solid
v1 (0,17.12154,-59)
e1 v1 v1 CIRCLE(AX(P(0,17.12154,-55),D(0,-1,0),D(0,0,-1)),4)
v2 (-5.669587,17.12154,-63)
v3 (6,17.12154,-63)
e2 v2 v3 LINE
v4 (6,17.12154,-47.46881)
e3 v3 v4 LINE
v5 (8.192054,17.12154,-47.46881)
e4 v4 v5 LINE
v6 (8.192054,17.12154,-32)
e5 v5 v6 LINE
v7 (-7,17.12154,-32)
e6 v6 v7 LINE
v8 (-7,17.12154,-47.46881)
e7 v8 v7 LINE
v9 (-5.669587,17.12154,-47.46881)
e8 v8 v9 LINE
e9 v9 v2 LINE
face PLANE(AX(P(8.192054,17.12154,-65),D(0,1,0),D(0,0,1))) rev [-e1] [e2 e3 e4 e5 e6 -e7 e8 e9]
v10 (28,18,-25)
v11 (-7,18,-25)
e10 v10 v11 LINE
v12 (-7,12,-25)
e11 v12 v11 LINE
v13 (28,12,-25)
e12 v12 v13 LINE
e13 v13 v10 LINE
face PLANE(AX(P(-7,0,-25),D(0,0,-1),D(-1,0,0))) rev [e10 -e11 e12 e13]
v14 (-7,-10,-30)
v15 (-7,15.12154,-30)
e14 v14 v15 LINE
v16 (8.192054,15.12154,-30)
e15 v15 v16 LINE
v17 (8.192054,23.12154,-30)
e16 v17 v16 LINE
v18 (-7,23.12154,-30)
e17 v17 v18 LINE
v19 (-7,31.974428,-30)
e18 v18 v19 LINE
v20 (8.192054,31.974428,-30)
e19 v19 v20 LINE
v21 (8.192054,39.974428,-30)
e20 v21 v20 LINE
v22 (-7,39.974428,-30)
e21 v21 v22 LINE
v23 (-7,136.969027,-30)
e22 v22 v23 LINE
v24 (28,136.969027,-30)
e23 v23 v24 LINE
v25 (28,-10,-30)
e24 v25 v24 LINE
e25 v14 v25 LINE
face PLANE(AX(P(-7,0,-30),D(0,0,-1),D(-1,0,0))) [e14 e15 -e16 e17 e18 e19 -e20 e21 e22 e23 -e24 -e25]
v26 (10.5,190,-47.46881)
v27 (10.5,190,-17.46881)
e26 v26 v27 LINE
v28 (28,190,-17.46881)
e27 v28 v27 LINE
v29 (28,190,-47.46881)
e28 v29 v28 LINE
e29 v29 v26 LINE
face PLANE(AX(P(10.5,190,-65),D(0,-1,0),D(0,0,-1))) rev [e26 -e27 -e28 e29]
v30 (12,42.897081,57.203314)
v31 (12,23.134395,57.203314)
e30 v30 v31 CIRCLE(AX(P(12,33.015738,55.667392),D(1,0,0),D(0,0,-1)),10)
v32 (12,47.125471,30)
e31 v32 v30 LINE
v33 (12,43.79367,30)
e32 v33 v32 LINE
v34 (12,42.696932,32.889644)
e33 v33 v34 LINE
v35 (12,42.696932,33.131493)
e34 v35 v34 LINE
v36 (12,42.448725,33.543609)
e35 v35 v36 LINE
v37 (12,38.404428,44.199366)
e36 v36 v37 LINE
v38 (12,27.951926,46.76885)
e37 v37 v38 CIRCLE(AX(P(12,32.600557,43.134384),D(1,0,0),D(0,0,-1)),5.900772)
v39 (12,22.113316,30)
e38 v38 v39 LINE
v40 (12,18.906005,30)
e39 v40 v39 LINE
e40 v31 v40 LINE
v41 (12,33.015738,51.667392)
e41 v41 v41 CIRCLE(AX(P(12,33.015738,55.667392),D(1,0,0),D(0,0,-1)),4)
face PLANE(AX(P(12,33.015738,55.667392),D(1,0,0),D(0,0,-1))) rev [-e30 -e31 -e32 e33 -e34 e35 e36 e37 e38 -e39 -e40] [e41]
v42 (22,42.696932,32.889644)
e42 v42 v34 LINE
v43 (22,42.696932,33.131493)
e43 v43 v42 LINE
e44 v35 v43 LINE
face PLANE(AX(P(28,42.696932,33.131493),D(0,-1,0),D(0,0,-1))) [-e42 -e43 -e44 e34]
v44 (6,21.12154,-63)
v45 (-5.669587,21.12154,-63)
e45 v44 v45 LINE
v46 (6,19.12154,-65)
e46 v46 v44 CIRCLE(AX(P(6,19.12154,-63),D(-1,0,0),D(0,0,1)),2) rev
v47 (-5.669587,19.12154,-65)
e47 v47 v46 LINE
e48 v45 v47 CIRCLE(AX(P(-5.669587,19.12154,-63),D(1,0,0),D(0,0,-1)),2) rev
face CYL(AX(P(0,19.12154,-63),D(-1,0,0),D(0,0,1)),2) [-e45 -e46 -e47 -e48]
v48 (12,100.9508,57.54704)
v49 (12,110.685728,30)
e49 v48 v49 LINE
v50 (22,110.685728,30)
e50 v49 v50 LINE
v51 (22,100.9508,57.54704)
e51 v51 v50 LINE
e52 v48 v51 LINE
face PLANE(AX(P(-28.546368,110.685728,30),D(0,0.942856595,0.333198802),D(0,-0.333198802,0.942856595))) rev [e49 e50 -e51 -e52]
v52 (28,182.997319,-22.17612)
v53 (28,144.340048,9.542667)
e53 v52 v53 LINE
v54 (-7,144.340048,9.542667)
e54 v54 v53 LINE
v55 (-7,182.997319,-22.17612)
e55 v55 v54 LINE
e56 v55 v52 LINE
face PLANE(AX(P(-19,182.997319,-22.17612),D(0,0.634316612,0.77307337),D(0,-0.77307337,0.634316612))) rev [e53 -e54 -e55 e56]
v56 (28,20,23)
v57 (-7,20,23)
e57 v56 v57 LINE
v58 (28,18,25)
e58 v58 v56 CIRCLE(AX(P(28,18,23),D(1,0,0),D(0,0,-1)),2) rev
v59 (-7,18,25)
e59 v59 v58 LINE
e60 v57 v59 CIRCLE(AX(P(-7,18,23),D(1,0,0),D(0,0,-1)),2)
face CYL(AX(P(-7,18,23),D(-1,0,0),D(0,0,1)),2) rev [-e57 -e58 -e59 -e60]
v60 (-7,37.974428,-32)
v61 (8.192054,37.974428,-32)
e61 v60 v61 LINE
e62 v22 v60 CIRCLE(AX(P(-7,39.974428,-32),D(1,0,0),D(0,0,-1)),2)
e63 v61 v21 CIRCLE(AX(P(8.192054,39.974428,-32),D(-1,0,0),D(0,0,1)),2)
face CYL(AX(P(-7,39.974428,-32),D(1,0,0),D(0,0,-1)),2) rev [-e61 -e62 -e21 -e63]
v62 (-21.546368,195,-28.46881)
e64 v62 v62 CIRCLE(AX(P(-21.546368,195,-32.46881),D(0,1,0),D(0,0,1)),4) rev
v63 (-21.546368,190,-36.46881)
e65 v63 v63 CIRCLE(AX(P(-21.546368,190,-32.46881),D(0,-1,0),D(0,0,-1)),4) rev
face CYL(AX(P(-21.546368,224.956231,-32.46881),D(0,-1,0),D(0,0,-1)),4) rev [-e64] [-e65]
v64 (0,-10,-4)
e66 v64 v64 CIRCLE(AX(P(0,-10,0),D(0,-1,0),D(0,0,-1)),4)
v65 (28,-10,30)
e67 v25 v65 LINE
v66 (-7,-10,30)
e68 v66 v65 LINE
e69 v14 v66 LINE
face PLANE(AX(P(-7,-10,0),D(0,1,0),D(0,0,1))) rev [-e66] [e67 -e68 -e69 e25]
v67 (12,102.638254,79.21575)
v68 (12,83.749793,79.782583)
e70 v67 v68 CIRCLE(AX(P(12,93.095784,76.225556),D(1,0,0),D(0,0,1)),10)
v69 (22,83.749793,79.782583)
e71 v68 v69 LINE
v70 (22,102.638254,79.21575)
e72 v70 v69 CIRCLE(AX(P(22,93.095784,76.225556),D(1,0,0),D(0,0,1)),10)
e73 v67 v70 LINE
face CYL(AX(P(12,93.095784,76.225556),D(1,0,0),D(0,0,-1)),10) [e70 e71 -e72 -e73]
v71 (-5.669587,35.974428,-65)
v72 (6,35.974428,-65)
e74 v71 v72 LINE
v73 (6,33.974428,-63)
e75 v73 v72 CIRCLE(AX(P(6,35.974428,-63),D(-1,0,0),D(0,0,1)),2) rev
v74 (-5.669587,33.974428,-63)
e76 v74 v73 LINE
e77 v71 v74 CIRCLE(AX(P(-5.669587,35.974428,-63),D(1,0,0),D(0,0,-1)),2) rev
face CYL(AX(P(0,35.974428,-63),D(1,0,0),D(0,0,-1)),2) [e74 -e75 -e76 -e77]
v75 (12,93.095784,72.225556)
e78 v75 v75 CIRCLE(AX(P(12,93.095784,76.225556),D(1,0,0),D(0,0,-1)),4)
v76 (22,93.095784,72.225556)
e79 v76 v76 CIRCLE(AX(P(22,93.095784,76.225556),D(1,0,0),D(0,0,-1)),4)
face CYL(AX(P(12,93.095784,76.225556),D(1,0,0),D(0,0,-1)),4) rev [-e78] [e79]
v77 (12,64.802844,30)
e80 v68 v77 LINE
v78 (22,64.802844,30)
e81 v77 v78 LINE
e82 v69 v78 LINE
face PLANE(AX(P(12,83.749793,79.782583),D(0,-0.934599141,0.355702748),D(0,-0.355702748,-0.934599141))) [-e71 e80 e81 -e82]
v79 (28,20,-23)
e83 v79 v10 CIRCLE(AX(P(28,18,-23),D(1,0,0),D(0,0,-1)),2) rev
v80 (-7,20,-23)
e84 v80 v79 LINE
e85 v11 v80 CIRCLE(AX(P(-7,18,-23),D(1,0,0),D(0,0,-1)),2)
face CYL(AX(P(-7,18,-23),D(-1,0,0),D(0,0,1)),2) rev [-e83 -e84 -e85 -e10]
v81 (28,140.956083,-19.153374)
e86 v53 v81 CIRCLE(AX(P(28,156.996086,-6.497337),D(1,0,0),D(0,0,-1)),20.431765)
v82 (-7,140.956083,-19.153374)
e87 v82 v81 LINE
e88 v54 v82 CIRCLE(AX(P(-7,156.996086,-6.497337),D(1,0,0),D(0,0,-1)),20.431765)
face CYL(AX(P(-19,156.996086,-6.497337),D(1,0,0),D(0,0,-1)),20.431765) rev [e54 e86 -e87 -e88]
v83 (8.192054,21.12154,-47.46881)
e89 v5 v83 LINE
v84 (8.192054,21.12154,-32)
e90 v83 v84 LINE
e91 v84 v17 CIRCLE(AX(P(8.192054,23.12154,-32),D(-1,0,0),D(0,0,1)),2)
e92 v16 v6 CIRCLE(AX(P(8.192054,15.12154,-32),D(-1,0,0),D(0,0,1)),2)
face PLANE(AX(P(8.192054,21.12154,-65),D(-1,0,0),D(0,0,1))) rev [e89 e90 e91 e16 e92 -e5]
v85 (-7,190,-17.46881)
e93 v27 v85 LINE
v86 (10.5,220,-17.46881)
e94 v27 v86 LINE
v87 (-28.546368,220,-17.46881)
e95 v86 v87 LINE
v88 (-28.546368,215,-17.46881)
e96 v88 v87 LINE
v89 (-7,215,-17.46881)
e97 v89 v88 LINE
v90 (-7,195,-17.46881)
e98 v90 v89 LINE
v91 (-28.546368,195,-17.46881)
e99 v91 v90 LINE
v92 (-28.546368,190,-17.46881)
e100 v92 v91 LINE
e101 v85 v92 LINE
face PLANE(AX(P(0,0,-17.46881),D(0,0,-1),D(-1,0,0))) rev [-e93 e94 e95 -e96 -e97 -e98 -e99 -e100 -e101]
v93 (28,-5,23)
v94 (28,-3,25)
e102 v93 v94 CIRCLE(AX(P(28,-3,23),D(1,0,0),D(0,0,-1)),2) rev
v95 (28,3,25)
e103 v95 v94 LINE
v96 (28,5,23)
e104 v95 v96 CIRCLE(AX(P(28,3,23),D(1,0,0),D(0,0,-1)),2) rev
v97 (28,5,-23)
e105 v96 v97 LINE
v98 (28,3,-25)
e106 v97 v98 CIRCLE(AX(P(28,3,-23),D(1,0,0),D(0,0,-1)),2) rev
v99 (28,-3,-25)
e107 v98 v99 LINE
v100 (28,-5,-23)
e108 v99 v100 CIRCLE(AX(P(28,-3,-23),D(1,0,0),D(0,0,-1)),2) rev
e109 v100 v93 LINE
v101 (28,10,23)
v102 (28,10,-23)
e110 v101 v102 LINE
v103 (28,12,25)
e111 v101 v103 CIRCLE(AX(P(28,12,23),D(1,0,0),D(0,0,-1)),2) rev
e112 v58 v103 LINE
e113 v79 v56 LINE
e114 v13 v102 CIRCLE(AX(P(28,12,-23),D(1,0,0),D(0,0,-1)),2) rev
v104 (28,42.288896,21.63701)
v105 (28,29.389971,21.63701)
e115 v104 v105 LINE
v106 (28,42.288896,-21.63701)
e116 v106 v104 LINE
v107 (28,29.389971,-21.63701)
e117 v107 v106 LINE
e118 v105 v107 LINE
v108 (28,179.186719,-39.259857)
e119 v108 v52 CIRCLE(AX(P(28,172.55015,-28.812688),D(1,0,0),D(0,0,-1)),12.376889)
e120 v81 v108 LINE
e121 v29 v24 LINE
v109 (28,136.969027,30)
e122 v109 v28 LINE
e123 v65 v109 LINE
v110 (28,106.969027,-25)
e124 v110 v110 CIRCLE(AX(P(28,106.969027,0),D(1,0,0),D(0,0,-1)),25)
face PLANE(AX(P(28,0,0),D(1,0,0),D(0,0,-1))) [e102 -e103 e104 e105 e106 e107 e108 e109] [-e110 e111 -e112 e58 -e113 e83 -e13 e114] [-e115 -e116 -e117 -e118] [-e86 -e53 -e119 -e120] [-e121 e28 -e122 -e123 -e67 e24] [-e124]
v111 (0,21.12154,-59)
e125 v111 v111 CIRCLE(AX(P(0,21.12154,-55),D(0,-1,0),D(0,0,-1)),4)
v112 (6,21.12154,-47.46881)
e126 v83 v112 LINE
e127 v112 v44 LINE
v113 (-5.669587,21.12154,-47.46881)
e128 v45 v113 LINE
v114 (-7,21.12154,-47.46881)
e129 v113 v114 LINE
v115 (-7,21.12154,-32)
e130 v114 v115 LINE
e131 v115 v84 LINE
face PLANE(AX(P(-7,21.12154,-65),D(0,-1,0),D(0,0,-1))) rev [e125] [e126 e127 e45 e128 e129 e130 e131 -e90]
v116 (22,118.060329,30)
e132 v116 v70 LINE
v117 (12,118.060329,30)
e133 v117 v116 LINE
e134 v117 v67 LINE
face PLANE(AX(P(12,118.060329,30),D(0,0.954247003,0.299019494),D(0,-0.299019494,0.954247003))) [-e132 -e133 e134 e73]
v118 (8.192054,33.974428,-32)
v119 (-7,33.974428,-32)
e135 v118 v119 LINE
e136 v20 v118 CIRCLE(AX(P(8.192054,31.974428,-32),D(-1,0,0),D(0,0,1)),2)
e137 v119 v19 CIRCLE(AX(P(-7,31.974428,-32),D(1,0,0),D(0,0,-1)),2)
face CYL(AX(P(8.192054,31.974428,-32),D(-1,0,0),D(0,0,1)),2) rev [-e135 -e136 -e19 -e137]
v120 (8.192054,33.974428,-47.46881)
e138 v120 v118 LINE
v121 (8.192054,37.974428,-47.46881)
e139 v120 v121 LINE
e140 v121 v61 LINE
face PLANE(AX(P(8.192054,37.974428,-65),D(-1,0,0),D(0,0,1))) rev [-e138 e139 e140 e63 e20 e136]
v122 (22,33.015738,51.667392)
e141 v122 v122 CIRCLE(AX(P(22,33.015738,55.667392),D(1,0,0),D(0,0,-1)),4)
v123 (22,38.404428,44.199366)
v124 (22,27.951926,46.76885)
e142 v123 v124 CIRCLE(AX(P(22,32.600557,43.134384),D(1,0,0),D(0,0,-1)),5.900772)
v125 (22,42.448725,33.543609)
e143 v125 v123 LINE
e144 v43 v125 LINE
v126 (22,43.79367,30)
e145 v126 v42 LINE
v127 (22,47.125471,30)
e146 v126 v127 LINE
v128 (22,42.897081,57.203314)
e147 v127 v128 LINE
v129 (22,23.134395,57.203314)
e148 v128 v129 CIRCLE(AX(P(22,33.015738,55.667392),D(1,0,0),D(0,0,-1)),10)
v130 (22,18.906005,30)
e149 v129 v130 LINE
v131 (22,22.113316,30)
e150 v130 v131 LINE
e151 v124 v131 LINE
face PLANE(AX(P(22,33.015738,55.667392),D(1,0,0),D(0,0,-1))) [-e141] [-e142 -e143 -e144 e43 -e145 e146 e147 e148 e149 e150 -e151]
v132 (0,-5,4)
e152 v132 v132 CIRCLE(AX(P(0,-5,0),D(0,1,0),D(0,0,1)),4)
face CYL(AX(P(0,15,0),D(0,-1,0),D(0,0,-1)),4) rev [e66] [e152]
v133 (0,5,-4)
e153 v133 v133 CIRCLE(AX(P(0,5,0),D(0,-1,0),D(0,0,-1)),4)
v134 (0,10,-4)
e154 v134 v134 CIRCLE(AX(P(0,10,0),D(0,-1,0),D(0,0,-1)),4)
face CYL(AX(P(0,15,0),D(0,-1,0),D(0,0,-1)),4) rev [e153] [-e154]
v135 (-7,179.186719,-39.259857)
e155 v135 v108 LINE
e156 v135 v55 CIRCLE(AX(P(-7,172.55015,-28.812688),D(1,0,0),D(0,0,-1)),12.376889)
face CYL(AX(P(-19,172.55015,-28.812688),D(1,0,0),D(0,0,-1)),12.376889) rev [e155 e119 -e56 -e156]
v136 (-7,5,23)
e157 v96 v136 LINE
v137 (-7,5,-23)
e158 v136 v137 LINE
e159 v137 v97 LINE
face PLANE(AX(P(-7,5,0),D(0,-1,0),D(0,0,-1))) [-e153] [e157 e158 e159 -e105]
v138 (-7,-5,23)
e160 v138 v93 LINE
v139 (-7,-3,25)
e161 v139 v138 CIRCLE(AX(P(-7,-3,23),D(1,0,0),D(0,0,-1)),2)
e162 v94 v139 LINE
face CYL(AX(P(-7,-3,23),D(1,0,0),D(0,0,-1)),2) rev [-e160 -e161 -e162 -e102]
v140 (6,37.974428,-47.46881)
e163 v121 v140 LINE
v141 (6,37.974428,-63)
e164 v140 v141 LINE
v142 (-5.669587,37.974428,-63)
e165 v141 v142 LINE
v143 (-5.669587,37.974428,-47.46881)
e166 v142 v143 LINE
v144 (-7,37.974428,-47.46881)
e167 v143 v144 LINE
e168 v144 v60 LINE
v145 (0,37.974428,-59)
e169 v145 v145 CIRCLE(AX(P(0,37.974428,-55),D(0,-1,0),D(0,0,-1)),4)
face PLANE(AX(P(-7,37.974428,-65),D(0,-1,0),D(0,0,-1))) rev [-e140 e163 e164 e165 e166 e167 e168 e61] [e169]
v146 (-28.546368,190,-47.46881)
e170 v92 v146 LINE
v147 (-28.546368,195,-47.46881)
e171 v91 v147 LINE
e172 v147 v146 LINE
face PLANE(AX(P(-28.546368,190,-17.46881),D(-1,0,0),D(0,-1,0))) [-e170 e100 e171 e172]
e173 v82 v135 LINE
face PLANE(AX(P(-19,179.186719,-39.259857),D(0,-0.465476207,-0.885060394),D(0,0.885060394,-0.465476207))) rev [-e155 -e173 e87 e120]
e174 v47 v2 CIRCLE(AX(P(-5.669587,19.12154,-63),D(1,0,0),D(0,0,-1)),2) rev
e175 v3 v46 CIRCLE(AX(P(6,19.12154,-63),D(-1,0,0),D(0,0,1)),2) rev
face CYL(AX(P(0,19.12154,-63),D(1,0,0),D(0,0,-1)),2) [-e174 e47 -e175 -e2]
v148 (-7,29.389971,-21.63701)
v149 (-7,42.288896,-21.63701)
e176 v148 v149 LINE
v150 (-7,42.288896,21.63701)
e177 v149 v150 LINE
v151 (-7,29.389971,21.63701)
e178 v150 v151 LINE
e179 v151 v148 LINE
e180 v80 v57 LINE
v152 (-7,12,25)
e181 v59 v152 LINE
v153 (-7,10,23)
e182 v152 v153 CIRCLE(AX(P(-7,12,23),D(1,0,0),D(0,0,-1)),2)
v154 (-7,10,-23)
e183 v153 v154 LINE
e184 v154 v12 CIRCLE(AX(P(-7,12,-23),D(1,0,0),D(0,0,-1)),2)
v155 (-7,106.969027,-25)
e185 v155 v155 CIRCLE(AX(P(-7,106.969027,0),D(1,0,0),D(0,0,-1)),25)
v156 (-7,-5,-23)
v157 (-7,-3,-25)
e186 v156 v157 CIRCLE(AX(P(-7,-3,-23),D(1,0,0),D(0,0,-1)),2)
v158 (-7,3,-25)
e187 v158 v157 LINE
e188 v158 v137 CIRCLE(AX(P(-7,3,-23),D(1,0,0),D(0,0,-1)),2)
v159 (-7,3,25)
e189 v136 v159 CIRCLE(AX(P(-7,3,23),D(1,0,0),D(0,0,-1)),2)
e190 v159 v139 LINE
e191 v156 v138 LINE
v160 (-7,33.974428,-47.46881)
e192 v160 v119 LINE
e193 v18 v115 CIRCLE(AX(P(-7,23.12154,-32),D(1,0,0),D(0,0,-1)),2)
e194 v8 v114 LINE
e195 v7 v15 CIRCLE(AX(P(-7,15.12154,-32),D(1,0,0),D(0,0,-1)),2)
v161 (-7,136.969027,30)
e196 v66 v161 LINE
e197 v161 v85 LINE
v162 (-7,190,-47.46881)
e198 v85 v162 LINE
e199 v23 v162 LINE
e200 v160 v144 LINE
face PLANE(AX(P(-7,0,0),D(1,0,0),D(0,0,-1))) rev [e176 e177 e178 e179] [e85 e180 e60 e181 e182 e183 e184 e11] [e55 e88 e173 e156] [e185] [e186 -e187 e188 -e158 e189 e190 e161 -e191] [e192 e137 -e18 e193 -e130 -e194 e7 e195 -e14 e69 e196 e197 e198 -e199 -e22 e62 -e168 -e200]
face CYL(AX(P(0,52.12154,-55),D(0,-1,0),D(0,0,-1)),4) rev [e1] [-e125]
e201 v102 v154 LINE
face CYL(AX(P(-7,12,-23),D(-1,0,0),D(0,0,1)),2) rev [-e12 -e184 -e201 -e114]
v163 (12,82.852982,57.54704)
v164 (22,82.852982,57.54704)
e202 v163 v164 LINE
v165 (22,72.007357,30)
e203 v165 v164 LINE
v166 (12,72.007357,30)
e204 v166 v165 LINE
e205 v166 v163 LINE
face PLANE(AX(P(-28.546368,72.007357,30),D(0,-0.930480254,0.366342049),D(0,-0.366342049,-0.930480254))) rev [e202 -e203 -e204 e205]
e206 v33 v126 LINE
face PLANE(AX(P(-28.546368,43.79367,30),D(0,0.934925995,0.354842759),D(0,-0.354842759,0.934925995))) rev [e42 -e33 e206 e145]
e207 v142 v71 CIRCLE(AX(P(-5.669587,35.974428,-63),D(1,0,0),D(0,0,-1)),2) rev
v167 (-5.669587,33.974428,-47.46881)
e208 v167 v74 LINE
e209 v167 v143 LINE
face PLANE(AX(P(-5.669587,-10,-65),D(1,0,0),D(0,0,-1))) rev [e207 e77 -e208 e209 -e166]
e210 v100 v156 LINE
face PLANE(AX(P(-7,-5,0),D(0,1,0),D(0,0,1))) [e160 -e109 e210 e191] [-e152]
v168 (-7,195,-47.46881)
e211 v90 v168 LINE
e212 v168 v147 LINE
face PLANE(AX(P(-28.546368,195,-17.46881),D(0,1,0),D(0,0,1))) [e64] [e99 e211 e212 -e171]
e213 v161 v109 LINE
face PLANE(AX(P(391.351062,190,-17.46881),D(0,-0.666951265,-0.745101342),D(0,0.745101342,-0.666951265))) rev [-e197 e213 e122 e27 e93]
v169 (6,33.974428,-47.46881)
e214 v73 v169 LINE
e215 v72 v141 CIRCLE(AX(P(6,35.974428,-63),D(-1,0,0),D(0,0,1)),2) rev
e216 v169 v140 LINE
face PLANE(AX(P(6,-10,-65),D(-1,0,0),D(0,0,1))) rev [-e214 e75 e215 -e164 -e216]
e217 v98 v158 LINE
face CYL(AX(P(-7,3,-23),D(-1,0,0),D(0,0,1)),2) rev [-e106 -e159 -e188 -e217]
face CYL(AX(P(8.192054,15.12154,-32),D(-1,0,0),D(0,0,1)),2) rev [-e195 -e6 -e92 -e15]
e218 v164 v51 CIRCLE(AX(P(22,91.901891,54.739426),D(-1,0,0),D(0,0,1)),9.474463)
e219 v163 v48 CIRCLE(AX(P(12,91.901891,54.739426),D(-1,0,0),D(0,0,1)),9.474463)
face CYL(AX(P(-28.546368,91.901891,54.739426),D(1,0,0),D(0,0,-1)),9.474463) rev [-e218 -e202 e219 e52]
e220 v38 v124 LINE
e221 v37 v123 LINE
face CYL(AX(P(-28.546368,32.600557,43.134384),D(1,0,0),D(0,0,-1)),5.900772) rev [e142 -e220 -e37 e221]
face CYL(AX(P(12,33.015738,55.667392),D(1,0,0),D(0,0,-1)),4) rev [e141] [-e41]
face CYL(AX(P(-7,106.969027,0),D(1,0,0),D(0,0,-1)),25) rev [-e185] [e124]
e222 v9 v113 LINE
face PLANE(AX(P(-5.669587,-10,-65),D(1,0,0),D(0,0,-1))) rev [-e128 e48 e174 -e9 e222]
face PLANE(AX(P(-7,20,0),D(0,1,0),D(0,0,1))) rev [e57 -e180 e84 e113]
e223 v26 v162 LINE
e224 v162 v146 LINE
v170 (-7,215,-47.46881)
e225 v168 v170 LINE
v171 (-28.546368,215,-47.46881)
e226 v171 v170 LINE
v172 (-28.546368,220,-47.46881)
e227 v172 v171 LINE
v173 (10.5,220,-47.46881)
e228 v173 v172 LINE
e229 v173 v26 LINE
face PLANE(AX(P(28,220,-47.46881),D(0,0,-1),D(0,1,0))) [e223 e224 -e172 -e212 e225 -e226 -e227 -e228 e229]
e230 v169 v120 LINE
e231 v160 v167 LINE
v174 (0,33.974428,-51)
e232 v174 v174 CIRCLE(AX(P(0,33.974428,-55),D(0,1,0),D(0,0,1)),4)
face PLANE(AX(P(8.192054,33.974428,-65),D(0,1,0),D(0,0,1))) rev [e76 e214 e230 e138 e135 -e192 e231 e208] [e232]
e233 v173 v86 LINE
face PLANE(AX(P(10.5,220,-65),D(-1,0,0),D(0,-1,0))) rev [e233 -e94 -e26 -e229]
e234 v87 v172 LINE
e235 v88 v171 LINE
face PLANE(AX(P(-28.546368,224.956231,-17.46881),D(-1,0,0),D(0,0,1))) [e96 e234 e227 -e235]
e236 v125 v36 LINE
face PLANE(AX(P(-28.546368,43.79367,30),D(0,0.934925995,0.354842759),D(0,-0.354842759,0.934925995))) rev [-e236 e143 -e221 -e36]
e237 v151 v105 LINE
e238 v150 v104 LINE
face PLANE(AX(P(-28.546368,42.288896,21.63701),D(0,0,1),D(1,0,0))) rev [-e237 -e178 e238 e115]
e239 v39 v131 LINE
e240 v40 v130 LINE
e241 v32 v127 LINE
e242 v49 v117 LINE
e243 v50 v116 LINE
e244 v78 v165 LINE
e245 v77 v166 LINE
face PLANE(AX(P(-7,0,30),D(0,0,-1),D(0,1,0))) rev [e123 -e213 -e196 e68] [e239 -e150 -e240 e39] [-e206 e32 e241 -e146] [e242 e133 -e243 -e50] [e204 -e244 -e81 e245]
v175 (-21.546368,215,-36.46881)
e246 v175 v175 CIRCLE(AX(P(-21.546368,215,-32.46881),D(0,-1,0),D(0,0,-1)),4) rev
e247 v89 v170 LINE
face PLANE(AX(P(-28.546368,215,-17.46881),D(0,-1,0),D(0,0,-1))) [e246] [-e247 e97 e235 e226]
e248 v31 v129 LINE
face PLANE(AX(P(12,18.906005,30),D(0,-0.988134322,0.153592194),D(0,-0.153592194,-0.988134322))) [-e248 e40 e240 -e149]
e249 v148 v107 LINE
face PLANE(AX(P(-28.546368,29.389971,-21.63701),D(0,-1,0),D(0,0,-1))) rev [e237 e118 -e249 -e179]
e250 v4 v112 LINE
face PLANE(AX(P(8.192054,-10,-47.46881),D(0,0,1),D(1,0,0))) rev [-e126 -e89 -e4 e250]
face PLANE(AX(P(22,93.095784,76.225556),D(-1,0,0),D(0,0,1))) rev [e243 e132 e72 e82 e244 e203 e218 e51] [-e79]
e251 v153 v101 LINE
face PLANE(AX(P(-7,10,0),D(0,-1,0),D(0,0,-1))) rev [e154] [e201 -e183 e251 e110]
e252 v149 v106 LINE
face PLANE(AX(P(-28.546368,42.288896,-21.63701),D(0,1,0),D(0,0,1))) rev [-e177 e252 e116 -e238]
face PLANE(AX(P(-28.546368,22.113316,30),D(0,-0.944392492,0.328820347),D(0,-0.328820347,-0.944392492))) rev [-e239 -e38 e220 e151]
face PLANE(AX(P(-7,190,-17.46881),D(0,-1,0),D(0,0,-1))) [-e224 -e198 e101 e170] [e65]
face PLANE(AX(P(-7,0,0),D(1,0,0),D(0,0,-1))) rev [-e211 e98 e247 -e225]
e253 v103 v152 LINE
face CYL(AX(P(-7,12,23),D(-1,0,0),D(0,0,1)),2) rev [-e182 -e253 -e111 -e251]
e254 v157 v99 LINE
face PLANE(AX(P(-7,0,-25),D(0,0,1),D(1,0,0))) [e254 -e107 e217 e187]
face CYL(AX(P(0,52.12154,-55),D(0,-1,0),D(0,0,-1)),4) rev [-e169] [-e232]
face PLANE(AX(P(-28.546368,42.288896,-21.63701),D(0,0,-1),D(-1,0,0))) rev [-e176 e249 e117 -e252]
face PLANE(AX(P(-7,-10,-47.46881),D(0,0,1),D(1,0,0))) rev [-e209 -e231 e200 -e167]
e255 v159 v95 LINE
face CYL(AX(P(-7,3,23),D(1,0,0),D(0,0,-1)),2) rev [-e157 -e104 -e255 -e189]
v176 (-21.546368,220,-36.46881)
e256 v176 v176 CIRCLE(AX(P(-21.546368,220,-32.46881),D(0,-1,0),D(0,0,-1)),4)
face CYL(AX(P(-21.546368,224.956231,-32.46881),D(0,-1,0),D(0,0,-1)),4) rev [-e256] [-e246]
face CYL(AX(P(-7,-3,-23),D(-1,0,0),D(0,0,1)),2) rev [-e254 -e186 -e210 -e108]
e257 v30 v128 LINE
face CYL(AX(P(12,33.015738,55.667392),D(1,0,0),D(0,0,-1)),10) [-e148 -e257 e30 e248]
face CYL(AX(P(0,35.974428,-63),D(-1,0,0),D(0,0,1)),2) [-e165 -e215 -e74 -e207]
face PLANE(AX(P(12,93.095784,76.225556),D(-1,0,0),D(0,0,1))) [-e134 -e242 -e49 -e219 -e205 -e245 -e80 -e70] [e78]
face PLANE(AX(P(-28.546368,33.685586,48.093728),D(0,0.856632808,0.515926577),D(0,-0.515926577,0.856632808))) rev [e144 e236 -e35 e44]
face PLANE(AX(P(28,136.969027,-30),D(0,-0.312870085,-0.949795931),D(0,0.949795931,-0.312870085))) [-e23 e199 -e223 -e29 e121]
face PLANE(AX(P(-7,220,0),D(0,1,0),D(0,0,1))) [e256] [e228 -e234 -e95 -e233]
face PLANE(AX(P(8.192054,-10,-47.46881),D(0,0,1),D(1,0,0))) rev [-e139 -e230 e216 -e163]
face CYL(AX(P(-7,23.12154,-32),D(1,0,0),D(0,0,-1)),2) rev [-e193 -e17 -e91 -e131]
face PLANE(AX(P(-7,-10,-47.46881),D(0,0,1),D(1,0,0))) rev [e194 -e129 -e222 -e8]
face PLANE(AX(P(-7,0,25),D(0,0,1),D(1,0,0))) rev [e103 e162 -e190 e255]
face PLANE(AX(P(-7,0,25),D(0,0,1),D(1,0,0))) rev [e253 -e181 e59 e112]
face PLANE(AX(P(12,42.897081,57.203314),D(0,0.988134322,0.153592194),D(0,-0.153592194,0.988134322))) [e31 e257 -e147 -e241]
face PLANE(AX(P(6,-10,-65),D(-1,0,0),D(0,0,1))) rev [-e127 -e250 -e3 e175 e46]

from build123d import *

# Parameters (mm, degrees)
BOSS_EXTRUDE1_DEPTH      = 28
BOSS_EXTRUDE1_DEPTH_BACK = 7
SKETCH1_R                = 25
SKETCH1_W                = 50
SKETCH1_H                = 10
SKETCH3_W                = 21.546368229
SKETCH3_H                = 5
SKETCH3_H_2              = 9.956231156
BOSS_EXTRUDE2_DEPTH      = 35
CUT_EXTRUDE1_DEPTH       = 238.629693409
CUT_EXTRUDE1_DEPTH_BACK  = 40
SKETCH4_R                = 4
SKETCH5_R                = 4
CUT_EXTRUDE2_DEPTH       = 25
SKETCH6_W                = 15.192054263
SKETCH6_H                = 4
BOSS_EXTRUDE4_DEPTH      = 35
SKETCH7_R                = 4
CUT_EXTRUDE3_DEPTH       = 35
BOSS_EXTRUDE5_DEPTH      = 5
BOSS_EXTRUDE5_DEPTH_BACK = 5
SKETCH8_R                = 4
FILLET1_R                = 2
FILLET2_R                = 2
FILLET3_R                = 2
FILLET4_R                = 2
CUT_EXTRUDE6_START       = -7
CUT_EXTRUDE6_DEPTH       = 35
CUT_EXTRUDE8_DEPTH       = 248.462409512
CUT_EXTRUDE9_DEPTH       = 243.60059254
CUT_EXTRUDE9_DEPTH_BACK  = 243.60059254
SKETCH17_W               = 17.5
SKETCH17_H               = 30
CUT_EXTRUDE10_DEPTH      = 243.60059254
SKETCH19_W               = 13.769789611
SKETCH19_H               = 21.894642499
SKETCH19_W_2             = 3.131492763
SKETCH19_H_2             = 18.022692281
CUT_EXTRUDE12_DEPTH      = 243.60059254
CUT_EXTRUDE13_DEPTH      = 243.60059254
CUT_EXTRUDE13_DEPTH_BACK = 243.60059254
SKETCH20_W               = 5
SKETCH20_H               = 30
SKETCH21_W               = 35
SKETCH21_H               = 4.956231156
CUT_EXTRUDE14_DEPTH      = 243.60059254
CUT_EXTRUDE18_DEPTH      = 239.012061805
CUT_EXTRUDE18_DEPTH_BACK = 239.012061805
CUT_EXTRUDE19_DEPTH      = 35
CUT_EXTRUDE19_DEPTH_BACK = 19
CUT_EXTRUDE20_DEPTH      = 239.012061805
CUT_EXTRUDE20_DEPTH_BACK = 239.012061805
SKETCH12_W               = 43.27401944
SKETCH12_H               = 12.898925582
CUT_EXTRUDE24_DEPTH      = 239.012061805
CUT_EXTRUDE24_DEPTH_BACK = 239.012061805
CUT_EXTRUDE26_DEPTH      = 239.012061805
CUT_EXTRUDE26_DEPTH_BACK = 239.012061805
CUT_EXTRUDE27_DEPTH      = 239.012061805
CUT_EXTRUDE27_DEPTH_BACK = 239.012061805
SKETCH29_W               = 2.192054263
SKETCH29_H               = 17.531189733
CUT_EXTRUDE28_DEPTH      = 239.012061805
CUT_EXTRUDE28_DEPTH_BACK = 239.012061805
SKETCH30_W               = 1.330412835
SKETCH30_H               = 17.531189733
CUT_EXTRUDE30_DEPTH      = 239.012061805
CUT_EXTRUDE30_DEPTH_BACK = 239.012061805


# Read off the part's stored shape, not the designer's step: Cut-Extrude6
with BuildPart() as part:
    # Sketch1 → Boss-Extrude1 (new, two sides: drawn at the far end of the back side and taken through both)
    # profile 1 of 3: a face of its own
    with BuildSketch(Plane(origin=(0, 0, 0), x_dir=(0, 0, -1), z_dir=(1, 0, 0)).offset(-BOSS_EXTRUDE1_DEPTH_BACK)):
        Polygon((12.468810267, 220), (12.468810267, 190), (52.468810267, 190), (52.468810267, 205), (52.468810267, 220), align=None)
    # profile 2 of 3: a face of its own
    with BuildSketch(Plane(origin=(0, 0, 0), x_dir=(0, 0, -1), z_dir=(1, 0, 0)).offset(-BOSS_EXTRUDE1_DEPTH_BACK)):
        Polygon((12.468810267, 190), (52.468810267, 190), (30, 136.969027383), (-30, 136.969027383), align=None)
    # profile 3 of 3: a face of its own
    with BuildSketch(Plane(origin=(0, 0, 0), x_dir=(0, 0, -1), z_dir=(1, 0, 0)).offset(-BOSS_EXTRUDE1_DEPTH_BACK)):
        Polygon((-30, 136.969027383), (30, 136.969027383), (30, 106.969027383), (30, 10), (30, -10), (-30, -10), (-30, 10), (-30, 106.969027383), align=None)
        with Locations((0, 106.969027383)):
            Circle(SKETCH1_R, mode=Mode.SUBTRACT)
        Polygon((-25, 20), (-25, 10), (0, 10), (25, 10), (25, 20), align=None, mode=Mode.SUBTRACT)
        Rectangle(SKETCH1_W, SKETCH1_H, mode=Mode.SUBTRACT)
    extrude(amount=BOSS_EXTRUDE1_DEPTH + BOSS_EXTRUDE1_DEPTH_BACK)

    # Sketch3 → Boss-Extrude2 (add)
    with BuildSketch(Plane(origin=(0, 0, -52.468810267), x_dir=(-1, 0, 0), z_dir=(0, 0, -1))):
        with Locations((17.773184115, 192.5)):
            Rectangle(SKETCH3_W, SKETCH3_H)
        with Locations((17.773184115, 219.978115578)):
            Rectangle(SKETCH3_W, SKETCH3_H_2)
    extrude(amount=-BOSS_EXTRUDE2_DEPTH)

    # Sketch4 → Cut-Extrude1 (cut, two sides: drawn at the far end of the back side and taken through both)
    with BuildSketch(Plane(origin=(0, 220, 0), x_dir=(1, 0, 0), z_dir=(0, 1, 0)).offset(-CUT_EXTRUDE1_DEPTH_BACK)):
        with Locations(Location((-21.546368229, 32.468810267, 0), (0, 0, 90))):
            Circle(SKETCH4_R)
    extrude(amount=CUT_EXTRUDE1_DEPTH + CUT_EXTRUDE1_DEPTH_BACK, mode=Mode.SUBTRACT)

    # Sketch5 → Cut-Extrude2 (cut)
    with BuildSketch(Plane.XZ.offset(10)):
        with Locations(Location((0, 0, 0), (0, 0, 270))):
            Circle(SKETCH5_R)
    extrude(amount=-CUT_EXTRUDE2_DEPTH, mode=Mode.SUBTRACT)

    # Sketch6 → Boss-Extrude4 (add)
    with BuildSketch(Plane(origin=(0, 0, -30), x_dir=(-1, 0, 0), z_dir=(0, 0, -1))):
        with Locations((-0.596027132, 35.974427815)):
            Rectangle(SKETCH6_W, SKETCH6_H)
        with Locations((-0.596027132, 19.121539986)):
            Rectangle(SKETCH6_W, SKETCH6_H)
    extrude(amount=BOSS_EXTRUDE4_DEPTH)

    # Sketch7 → Cut-Extrude3 (cut)
    with BuildSketch(Plane.XZ.offset(-17.121539986)):
        with Locations(Location((0, -55, 0), (0, 0, 270))):
            Circle(SKETCH7_R)
    extrude(amount=-CUT_EXTRUDE3_DEPTH, mode=Mode.SUBTRACT)

    # Sketch8 → Boss-Extrude5 (add, two sides: drawn at the far end of the back side and taken through both)
    # profile 1 of 2: a face of its own
    with BuildSketch(Plane(origin=(17, 0, 0), x_dir=(0, 0, -1), z_dir=(1, 0, 0)).offset(-BOSS_EXTRUDE5_DEPTH_BACK)):
        with BuildLine():
            Line((-30, 118.060328993), (-30, 64.802844314))
            Line((-30, 64.802844314), (-79.782583008, 83.7497926))
            ThreePointArc((-79.782583008, 83.7497926), (-86.221055725, 93.395743584), (-79.215750464, 102.638254039))
            Line((-79.215750464, 102.638254039), (-30, 118.060328993))
        make_face()
        with Locations((-76.225555525, 93.095784012)):
            Circle(SKETCH8_R, mode=Mode.SUBTRACT)
    # profile 2 of 2: a face of its own
    with BuildSketch(Plane(origin=(17, 0, 0), x_dir=(0, 0, -1), z_dir=(1, 0, 0)).offset(-BOSS_EXTRUDE5_DEPTH_BACK)):
        with BuildLine():
            Line((-30, 47.125470645), (-30, 18.906005285))
            Line((-30, 18.906005285), (-57.203314441, 23.134394747))
            ThreePointArc((-57.203314441, 23.134394747), (-65.667392499, 33.015737965), (-57.203314441, 42.897081183))
            Line((-57.203314441, 42.897081183), (-30, 47.125470645))
        make_face()
        with Locations((-55.667392499, 33.015737965)):
            Circle(SKETCH8_R, mode=Mode.SUBTRACT)
    extrude(amount=BOSS_EXTRUDE5_DEPTH + BOSS_EXTRUDE5_DEPTH_BACK)

    # Fillet1
    fillet1_edges = [part.edges().sort_by_distance(p)[0] for p in [
        (0.596027131, 37.974427815, -30),
        (0.596027131, 33.974427815, -30),
        (0.596027131, 17.121539986, -30),
        (0.596027131, 21.121539986, -30),
    ]]
    fillet(fillet1_edges, radius=FILLET1_R)

    # Fillet2
    fillet2_edges = [part.edges().sort_by_distance(p)[0] for p in [
        (10.5, -5, 25),
        (10.5, -5, -25),
        (10.5, 10, 25),
        (10.5, 10, -25),
    ]]
    fillet(fillet2_edges, radius=FILLET2_R)

    # Fillet3
    fillet3_edges = [part.edges().sort_by_distance(p)[0] for p in [
        (10.5, 5, 25),
        (10.5, 5, -25),
        (10.5, 20, -25),
        (10.5, 20, 25),
    ]]
    fillet(fillet3_edges, radius=FILLET3_R)

    # Fillet4
    fillet4_edges = [part.edges().sort_by_distance(p)[0] for p in [
        (0.596027131, 17.121539986, -65),
        (0.596027131, 21.121539986, -65),
        (0.596027131, 33.974427815, -65),
        (0.596027131, 37.974427815, -65),
    ]]
    fillet(fillet4_edges, radius=FILLET4_R - 0.0001)  # a hair under: the kernel refuses the full size

    # Cut-Extrude6 outline → Cut-Extrude6 (cut)
    with BuildSketch(Plane(origin=(0, 0, 0), x_dir=(0, 0, -1), z_dir=(1, 0, 0)).offset(CUT_EXTRUDE6_START)):
        Polygon((-30, 136.969027383), (17.468810267, 190), (17.468810267, 220), (12.468810267, 220), (12.468810267, 190), align=None)
    extrude(amount=CUT_EXTRUDE6_DEPTH, mode=Mode.SUBTRACT)

    # Sketch14 → Cut-Extrude8 (cut, through all)
    with BuildSketch(Plane(origin=(28, 0, 0), x_dir=(0, 0, -1), z_dir=(1, 0, 0))):
        with BuildLine():
            Line((34.1686498, 172.523023356), (15.653218162, 146.807146081))
            ThreePointArc((15.653218162, 146.807146081), (6.378159707, 145.297252844), (4.86826647, 154.572311299))
            Line((4.86826647, 154.572311299), (23.383698108, 180.288188574))
            ThreePointArc((23.383698108, 180.288188574), (32.658756563, 181.798081811), (34.1686498, 172.523023356))
        make_face()
    extrude(amount=-CUT_EXTRUDE8_DEPTH, mode=Mode.SUBTRACT)

    # Sketch15 → Cut-Extrude9 (cut, two sides: drawn at the far end of the back side and taken through both)
    with BuildSketch(Plane(origin=(0, 0, 0), x_dir=(0, 0, -1), z_dir=(1, 0, 0)).offset(-CUT_EXTRUDE9_DEPTH_BACK)):
        Polygon((-43.769789611, 101.48799534), (-43.769789611, 79.593352841), (-61.94647395, 90.54067409), align=None)
        Polygon((-33.131492763, 42.696931743), (-33.131492763, 24.674239462), (-48.093727864, 33.685585602), align=None)
    extrude(amount=CUT_EXTRUDE9_DEPTH + CUT_EXTRUDE9_DEPTH_BACK, mode=Mode.SUBTRACT)

    # Sketch17 → Cut-Extrude10 (cut, through all)
    with BuildSketch(Plane.XY):
        with Locations((19.25, 205)):
            Rectangle(SKETCH17_W, SKETCH17_H)
    extrude(amount=-CUT_EXTRUDE10_DEPTH, mode=Mode.SUBTRACT)

    # Sketch19 → Cut-Extrude12 (cut, through all)
    with BuildSketch(Plane(origin=(0, 0, 0), x_dir=(0, 0, -1), z_dir=(1, 0, 0))):
        with Locations((-36.884894806, 90.540674091)):
            Rectangle(SKETCH19_W, SKETCH19_H)
        with Locations((-31.565746382, 33.685585602)):
            Rectangle(SKETCH19_W_2, SKETCH19_H_2)
    extrude(amount=CUT_EXTRUDE12_DEPTH, mode=Mode.SUBTRACT)

    # Sketch20 → Cut-Extrude13 (cut, two sides: drawn at the far end of the back side and taken through both)
    with BuildSketch(Plane(origin=(0, 0, 0), x_dir=(0, 0, -1), z_dir=(1, 0, 0)).offset(-CUT_EXTRUDE13_DEPTH_BACK)):
        with Locations((49.968810267, 205)):
            Rectangle(SKETCH20_W, SKETCH20_H)
    extrude(amount=CUT_EXTRUDE13_DEPTH + CUT_EXTRUDE13_DEPTH_BACK, mode=Mode.SUBTRACT)

    # Sketch21 → Cut-Extrude14 (cut, through all)
    with BuildSketch(Plane(origin=(0, 0, 0), x_dir=(0, 0, -1), z_dir=(1, 0, 0))):
        with Locations((34.968810267, 222.478115578)):
            Rectangle(SKETCH21_W, SKETCH21_H)
    extrude(amount=-CUT_EXTRUDE14_DEPTH, mode=Mode.SUBTRACT)

    # Sketch23 → Cut-Extrude18 (cut, two sides: drawn at the far end of the back side and taken through both)
    with BuildSketch(Plane(origin=(0, 0, 0), x_dir=(0, 0, -1), z_dir=(1, 0, 0)).offset(-CUT_EXTRUDE18_DEPTH_BACK)):
        Polygon((30, 136.969027383), (47.468810267, 190), (52.468810267, 190), align=None)
    extrude(amount=CUT_EXTRUDE18_DEPTH + CUT_EXTRUDE18_DEPTH_BACK, mode=Mode.SUBTRACT)

    # Sketch24 → Cut-Extrude19 (cut, two sides: drawn at the far end of the back side and taken through both)
    with BuildSketch(Plane(origin=(0, 0, 0), x_dir=(0, 0, -1), z_dir=(1, 0, 0)).offset(-CUT_EXTRUDE19_DEPTH_BACK)):
        with BuildLine():
            Line((22.176119959, 182.997319441), (-9.542666893, 144.340047966))
            ThreePointArc((-9.542666893, 144.340047966), (4.104511603, 136.704920477), (19.153374483, 140.956082513))
            Line((19.153374483, 140.956082513), (39.259857136, 179.186718543))
            ThreePointArc((39.259857136, 179.186718543), (31.507189834, 184.630176809), (22.176119959, 182.997319441))
        make_face()
    extrude(amount=CUT_EXTRUDE19_DEPTH + CUT_EXTRUDE19_DEPTH_BACK, mode=Mode.SUBTRACT)

    # Sketch12 → Cut-Extrude20 (cut, two sides: drawn at the far end of the back side and taken through both)
    with BuildSketch(Plane(origin=(0, 0, 0), x_dir=(0, 0, -1), z_dir=(1, 0, 0)).offset(-CUT_EXTRUDE20_DEPTH_BACK)):
        with Locations((0, 35.83943368)):
            Rectangle(SKETCH12_W, SKETCH12_H)
    extrude(amount=CUT_EXTRUDE20_DEPTH + CUT_EXTRUDE20_DEPTH_BACK, mode=Mode.SUBTRACT)

    # Sketch26 → Cut-Extrude24 (cut, two sides: drawn at the far end of the back side and taken through both)
    with BuildSketch(Plane(origin=(0, 0, 0), x_dir=(0, 0, -1), z_dir=(1, 0, 0)).offset(-CUT_EXTRUDE24_DEPTH_BACK)):
        with BuildLine():
            Line((-30, 110.685727942), (-57.547040207, 100.950800214))
            ThreePointArc((-57.547040207, 100.950800214), (-64.213889767, 91.901890883), (-57.547040207, 82.852981552))
            Line((-57.547040207, 82.852981552), (-30, 72.007357372))
            Line((-30, 72.007357372), (-30, 110.685727942))
        make_face()
    extrude(amount=CUT_EXTRUDE24_DEPTH + CUT_EXTRUDE24_DEPTH_BACK, mode=Mode.SUBTRACT)

    # Sketch28 → Cut-Extrude26 (cut, two sides: drawn at the far end of the back side and taken through both)
    with BuildSketch(Plane(origin=(0, 0, 0), x_dir=(0, 0, -1), z_dir=(1, 0, 0)).offset(-CUT_EXTRUDE26_DEPTH_BACK)):
        with BuildLine():
            Line((-30, 43.793670296), (-44.199366323, 38.404428428))
            ThreePointArc((-44.199366323, 38.404428428), (-48.048196325, 34.271707278), (-45.635023396, 29.16587993))
            Line((-45.635023396, 29.16587993), (-30, 23.168887083))
            Line((-30, 23.168887083), (-30, 43.793670296))
        make_face()
    extrude(amount=CUT_EXTRUDE26_DEPTH + CUT_EXTRUDE26_DEPTH_BACK, mode=Mode.SUBTRACT)

    # Sketch29 → Cut-Extrude27 (cut, two sides: drawn at the far end of the back side and taken through both)
    with BuildSketch(Plane(origin=(0, 0, 0), x_dir=(1, 0, 0), z_dir=(0, 1, 0)).offset(-CUT_EXTRUDE27_DEPTH_BACK)):
        with Locations((7.096027132, 56.234405134)):
            Rectangle(SKETCH29_W, SKETCH29_H)
    extrude(amount=CUT_EXTRUDE27_DEPTH + CUT_EXTRUDE27_DEPTH_BACK, mode=Mode.SUBTRACT)

    # Sketch30 → Cut-Extrude28 (cut, two sides: drawn at the far end of the back side and taken through both)
    with BuildSketch(Plane(origin=(0, 0, 0), x_dir=(1, 0, 0), z_dir=(0, 1, 0)).offset(-CUT_EXTRUDE28_DEPTH_BACK)):
        with Locations((-6.334793582, 56.234405134)):
            Rectangle(SKETCH30_W, SKETCH30_H)
    extrude(amount=CUT_EXTRUDE28_DEPTH + CUT_EXTRUDE28_DEPTH_BACK, mode=Mode.SUBTRACT)

    # Sketch31 → Cut-Extrude30 (cut, two sides: drawn at the far end of the back side and taken through both)
    with BuildSketch(Plane(origin=(0, 0, 0), x_dir=(0, 0, -1), z_dir=(1, 0, 0)).offset(-CUT_EXTRUDE30_DEPTH_BACK)):
        with BuildLine():
            Line((-30, 22.113316023), (-46.768850349, 27.951925747))
            ThreePointArc((-46.768850349, 27.951925747), (-48.864559319, 34.00917566), (-44.199366323, 38.404428428))
            Line((-44.199366323, 38.404428428), (-30, 43.793670296))
            Line((-30, 43.793670296), (-30, 22.113316023))
        make_face()
    extrude(amount=CUT_EXTRUDE30_DEPTH + CUT_EXTRUDE30_DEPTH_BACK, mode=Mode.SUBTRACT)


solid = part.part
